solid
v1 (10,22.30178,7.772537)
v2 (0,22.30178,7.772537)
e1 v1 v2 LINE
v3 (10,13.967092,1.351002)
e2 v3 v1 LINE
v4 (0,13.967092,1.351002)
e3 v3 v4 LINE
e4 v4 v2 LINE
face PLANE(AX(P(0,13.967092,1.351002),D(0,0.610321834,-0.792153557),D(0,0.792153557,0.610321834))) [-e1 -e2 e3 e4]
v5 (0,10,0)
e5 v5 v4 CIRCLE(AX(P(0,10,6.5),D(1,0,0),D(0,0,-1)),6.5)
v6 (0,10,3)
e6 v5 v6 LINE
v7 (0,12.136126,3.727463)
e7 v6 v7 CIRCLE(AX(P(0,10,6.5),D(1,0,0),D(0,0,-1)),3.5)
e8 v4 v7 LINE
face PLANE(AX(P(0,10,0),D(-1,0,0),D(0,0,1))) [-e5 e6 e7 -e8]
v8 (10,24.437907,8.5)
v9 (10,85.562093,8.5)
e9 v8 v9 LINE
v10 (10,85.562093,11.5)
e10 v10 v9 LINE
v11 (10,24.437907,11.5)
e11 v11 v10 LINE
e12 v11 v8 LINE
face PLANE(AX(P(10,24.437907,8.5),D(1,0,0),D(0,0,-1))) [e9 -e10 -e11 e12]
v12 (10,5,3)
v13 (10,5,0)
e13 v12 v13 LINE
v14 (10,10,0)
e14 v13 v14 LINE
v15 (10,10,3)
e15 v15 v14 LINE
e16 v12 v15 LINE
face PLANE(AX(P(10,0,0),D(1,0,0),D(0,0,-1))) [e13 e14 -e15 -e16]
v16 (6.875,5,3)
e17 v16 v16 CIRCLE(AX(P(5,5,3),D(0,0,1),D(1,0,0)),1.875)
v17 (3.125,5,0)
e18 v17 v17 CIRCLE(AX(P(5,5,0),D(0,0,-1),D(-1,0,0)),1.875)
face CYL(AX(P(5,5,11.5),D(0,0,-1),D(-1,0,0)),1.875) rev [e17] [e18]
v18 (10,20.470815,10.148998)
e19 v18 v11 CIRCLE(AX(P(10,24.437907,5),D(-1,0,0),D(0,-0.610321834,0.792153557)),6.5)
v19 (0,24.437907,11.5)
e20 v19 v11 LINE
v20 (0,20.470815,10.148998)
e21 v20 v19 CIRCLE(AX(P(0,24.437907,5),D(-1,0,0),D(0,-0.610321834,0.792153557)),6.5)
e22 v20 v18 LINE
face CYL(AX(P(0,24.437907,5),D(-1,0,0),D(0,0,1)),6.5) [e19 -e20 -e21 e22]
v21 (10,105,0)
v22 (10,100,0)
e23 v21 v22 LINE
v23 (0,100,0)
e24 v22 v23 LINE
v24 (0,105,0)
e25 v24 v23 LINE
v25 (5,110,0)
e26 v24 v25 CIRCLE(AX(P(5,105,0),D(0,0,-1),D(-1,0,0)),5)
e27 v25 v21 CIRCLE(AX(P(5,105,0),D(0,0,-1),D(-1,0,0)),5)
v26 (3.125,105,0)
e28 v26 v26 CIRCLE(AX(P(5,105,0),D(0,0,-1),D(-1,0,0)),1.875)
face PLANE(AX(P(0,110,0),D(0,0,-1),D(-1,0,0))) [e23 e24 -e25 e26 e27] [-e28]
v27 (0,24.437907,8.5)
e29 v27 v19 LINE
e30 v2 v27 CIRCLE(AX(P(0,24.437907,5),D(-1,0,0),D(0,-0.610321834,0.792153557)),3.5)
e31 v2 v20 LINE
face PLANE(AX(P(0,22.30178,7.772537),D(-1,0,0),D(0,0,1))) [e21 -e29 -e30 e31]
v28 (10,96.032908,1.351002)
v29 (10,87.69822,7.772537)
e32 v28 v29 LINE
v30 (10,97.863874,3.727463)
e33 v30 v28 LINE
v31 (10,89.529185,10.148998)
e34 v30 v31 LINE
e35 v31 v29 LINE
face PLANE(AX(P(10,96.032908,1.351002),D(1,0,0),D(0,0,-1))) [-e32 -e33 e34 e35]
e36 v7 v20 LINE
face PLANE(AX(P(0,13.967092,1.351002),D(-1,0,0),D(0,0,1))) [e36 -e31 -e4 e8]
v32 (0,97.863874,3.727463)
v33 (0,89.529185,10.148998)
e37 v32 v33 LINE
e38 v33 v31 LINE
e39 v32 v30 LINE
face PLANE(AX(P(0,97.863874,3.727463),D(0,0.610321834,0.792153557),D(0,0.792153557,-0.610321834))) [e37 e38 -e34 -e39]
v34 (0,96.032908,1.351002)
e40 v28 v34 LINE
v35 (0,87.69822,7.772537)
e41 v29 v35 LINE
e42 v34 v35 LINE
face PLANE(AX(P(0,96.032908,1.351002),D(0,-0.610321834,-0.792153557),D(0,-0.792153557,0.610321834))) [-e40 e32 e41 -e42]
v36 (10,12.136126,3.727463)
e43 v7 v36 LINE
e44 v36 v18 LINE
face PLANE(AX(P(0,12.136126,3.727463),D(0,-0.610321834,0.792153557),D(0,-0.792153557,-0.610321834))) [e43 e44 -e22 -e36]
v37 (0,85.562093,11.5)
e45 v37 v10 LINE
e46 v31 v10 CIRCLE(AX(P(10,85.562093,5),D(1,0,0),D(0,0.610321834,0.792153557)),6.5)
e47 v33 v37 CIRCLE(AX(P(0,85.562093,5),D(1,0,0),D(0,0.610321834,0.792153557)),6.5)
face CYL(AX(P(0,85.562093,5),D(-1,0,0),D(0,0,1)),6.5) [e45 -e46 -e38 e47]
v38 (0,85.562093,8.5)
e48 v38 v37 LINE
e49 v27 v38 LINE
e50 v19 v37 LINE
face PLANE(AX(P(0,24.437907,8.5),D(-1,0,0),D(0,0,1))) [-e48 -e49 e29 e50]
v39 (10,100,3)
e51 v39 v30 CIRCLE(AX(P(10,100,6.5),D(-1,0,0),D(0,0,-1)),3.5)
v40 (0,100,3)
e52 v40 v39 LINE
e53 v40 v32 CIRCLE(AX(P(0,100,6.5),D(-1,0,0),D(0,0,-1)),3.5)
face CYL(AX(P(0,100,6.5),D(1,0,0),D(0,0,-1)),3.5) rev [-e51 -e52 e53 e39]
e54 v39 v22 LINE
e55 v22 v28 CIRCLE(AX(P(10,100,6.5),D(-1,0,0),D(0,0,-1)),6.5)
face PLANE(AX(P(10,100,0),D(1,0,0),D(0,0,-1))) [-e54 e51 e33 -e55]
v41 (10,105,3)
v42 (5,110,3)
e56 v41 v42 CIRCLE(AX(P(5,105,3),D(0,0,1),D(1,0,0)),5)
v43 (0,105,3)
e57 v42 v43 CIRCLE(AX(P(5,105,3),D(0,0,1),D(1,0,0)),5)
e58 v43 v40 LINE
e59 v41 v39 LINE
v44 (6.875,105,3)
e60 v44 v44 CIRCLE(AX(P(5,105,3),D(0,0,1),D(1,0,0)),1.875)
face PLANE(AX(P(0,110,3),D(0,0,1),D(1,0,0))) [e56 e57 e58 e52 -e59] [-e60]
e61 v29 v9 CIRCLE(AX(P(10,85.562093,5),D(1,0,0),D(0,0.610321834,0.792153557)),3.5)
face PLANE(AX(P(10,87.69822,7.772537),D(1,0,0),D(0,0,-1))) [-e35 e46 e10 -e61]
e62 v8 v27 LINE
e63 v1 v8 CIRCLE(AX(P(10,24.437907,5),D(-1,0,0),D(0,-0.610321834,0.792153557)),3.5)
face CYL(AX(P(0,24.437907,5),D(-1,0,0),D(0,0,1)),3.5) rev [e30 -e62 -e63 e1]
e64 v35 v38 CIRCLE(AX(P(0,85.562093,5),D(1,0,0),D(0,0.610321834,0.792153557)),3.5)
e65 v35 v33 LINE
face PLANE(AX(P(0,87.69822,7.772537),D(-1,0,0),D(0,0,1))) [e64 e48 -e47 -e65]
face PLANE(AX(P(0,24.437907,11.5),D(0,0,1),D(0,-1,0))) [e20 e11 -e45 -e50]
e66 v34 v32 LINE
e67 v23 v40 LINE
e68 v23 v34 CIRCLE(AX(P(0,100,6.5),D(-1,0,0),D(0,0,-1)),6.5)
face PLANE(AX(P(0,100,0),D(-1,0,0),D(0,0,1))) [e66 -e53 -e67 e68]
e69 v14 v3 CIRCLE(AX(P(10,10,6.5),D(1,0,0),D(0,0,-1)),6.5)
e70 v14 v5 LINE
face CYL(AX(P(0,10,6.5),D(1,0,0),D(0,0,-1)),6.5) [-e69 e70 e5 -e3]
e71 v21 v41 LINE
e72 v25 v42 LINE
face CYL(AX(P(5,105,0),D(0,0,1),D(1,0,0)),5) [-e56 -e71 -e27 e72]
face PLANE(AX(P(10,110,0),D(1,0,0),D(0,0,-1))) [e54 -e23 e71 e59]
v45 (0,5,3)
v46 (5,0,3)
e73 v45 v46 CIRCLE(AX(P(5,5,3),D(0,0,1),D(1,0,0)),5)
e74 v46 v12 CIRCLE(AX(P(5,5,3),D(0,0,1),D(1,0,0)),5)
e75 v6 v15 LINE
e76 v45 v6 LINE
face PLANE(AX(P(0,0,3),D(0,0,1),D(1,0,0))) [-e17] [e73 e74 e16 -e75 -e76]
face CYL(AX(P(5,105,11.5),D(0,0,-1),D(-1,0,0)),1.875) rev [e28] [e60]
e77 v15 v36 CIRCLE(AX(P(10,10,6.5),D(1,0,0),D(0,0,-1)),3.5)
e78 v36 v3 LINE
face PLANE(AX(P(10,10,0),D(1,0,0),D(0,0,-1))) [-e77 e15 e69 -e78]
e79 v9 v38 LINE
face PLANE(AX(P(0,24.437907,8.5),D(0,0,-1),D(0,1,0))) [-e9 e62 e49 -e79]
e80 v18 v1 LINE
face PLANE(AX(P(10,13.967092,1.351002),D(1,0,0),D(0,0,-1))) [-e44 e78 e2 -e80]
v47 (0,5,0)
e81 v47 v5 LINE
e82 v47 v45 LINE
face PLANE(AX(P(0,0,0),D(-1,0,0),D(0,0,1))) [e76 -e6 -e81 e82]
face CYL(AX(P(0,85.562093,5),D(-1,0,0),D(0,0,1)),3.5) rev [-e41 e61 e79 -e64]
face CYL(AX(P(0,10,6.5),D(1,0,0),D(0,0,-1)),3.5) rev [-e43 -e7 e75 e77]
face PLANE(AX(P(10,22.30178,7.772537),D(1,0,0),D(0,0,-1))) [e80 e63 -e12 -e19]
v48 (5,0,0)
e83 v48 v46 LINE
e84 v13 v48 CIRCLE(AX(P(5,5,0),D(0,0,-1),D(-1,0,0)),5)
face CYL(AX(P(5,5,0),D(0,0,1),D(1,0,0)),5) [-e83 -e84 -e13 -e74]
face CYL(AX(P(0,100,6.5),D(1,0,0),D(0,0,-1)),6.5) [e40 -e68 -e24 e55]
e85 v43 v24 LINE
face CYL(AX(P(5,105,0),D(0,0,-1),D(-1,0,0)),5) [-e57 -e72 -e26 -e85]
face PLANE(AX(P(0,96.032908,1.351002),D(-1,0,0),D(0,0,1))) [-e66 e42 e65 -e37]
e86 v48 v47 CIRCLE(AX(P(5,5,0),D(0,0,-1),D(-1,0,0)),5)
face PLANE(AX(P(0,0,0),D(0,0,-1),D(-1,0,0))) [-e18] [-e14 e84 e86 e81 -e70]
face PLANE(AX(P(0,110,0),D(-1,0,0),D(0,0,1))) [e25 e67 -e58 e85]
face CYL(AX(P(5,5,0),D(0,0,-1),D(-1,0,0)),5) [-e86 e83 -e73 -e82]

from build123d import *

# Parameters (mm, degrees)
SKETCH6_W          = 10
SKETCH6_H          = 3
SKETCH8_R          = 1.875
CUT_EXTRUDE2_DEPTH = 112.050664113
FILLET1_R          = 5


with BuildPart() as part:
    # Sweep1: sweep along a path in Sketch7
    with BuildLine(Plane(origin=(0, 0, 0), x_dir=(0, 0, -1), z_dir=(1, 0, 0))) as sweep1_path:
        Line((-1.5, 0), (-1.5, 10))
        ThreePointArc((-1.5, 10), (-1.766933397, 11.611856238), (-2.539232213, 13.051609172))
        Line((-2.539232213, 13.051609172), (-8.960767787, 21.386297467))
        ThreePointArc((-8.960767787, 21.386297467), (-9.733066603, 22.8260504), (-10, 24.437906639))
        Line((-10, 24.437906639), (-10, 55))
    # Sketch6 → Sweep1 (sweep)
    with BuildSketch(Plane(origin=(0, 0, 0), x_dir=(1, 0, 0), z_dir=(0, 1, 0))):
        with Locations((5, -1.5)):
            Rectangle(SKETCH6_W, SKETCH6_H)
    sweep(path=sweep1_path.line)

    # Mirror2: part across plane


with BuildPart() as part_1:
    add(part.part)
    add(part.part.mirror(Plane(origin=(0, 55, 8.5), x_dir=(0, 0, 1), z_dir=(0, 1, 0))))

    # Sketch8 → Cut-Extrude2 (cut, through all)
    with BuildSketch(Plane(origin=(0, 0, 0), x_dir=(-1, 0, 0), z_dir=(0, 0, -1))):
        with Locations((-5, 5)):
            Circle(SKETCH8_R)
        with Locations((-5, 105)):
            Circle(SKETCH8_R)
    extrude(amount=-CUT_EXTRUDE2_DEPTH, mode=Mode.SUBTRACT)

    # Fillet1
    fillet1_edges = [part_1.edges().sort_by_distance(p)[0] for p in [
        (0, 0, 1.5),
        (10, 0, 1.5),
        (10, 110, 1.5),
        (0, 110, 1.5),
    ]]
    fillet(fillet1_edges, radius=FILLET1_R - 0.0001)  # a hair under: the kernel refuses the full size


solid = part_1.part
